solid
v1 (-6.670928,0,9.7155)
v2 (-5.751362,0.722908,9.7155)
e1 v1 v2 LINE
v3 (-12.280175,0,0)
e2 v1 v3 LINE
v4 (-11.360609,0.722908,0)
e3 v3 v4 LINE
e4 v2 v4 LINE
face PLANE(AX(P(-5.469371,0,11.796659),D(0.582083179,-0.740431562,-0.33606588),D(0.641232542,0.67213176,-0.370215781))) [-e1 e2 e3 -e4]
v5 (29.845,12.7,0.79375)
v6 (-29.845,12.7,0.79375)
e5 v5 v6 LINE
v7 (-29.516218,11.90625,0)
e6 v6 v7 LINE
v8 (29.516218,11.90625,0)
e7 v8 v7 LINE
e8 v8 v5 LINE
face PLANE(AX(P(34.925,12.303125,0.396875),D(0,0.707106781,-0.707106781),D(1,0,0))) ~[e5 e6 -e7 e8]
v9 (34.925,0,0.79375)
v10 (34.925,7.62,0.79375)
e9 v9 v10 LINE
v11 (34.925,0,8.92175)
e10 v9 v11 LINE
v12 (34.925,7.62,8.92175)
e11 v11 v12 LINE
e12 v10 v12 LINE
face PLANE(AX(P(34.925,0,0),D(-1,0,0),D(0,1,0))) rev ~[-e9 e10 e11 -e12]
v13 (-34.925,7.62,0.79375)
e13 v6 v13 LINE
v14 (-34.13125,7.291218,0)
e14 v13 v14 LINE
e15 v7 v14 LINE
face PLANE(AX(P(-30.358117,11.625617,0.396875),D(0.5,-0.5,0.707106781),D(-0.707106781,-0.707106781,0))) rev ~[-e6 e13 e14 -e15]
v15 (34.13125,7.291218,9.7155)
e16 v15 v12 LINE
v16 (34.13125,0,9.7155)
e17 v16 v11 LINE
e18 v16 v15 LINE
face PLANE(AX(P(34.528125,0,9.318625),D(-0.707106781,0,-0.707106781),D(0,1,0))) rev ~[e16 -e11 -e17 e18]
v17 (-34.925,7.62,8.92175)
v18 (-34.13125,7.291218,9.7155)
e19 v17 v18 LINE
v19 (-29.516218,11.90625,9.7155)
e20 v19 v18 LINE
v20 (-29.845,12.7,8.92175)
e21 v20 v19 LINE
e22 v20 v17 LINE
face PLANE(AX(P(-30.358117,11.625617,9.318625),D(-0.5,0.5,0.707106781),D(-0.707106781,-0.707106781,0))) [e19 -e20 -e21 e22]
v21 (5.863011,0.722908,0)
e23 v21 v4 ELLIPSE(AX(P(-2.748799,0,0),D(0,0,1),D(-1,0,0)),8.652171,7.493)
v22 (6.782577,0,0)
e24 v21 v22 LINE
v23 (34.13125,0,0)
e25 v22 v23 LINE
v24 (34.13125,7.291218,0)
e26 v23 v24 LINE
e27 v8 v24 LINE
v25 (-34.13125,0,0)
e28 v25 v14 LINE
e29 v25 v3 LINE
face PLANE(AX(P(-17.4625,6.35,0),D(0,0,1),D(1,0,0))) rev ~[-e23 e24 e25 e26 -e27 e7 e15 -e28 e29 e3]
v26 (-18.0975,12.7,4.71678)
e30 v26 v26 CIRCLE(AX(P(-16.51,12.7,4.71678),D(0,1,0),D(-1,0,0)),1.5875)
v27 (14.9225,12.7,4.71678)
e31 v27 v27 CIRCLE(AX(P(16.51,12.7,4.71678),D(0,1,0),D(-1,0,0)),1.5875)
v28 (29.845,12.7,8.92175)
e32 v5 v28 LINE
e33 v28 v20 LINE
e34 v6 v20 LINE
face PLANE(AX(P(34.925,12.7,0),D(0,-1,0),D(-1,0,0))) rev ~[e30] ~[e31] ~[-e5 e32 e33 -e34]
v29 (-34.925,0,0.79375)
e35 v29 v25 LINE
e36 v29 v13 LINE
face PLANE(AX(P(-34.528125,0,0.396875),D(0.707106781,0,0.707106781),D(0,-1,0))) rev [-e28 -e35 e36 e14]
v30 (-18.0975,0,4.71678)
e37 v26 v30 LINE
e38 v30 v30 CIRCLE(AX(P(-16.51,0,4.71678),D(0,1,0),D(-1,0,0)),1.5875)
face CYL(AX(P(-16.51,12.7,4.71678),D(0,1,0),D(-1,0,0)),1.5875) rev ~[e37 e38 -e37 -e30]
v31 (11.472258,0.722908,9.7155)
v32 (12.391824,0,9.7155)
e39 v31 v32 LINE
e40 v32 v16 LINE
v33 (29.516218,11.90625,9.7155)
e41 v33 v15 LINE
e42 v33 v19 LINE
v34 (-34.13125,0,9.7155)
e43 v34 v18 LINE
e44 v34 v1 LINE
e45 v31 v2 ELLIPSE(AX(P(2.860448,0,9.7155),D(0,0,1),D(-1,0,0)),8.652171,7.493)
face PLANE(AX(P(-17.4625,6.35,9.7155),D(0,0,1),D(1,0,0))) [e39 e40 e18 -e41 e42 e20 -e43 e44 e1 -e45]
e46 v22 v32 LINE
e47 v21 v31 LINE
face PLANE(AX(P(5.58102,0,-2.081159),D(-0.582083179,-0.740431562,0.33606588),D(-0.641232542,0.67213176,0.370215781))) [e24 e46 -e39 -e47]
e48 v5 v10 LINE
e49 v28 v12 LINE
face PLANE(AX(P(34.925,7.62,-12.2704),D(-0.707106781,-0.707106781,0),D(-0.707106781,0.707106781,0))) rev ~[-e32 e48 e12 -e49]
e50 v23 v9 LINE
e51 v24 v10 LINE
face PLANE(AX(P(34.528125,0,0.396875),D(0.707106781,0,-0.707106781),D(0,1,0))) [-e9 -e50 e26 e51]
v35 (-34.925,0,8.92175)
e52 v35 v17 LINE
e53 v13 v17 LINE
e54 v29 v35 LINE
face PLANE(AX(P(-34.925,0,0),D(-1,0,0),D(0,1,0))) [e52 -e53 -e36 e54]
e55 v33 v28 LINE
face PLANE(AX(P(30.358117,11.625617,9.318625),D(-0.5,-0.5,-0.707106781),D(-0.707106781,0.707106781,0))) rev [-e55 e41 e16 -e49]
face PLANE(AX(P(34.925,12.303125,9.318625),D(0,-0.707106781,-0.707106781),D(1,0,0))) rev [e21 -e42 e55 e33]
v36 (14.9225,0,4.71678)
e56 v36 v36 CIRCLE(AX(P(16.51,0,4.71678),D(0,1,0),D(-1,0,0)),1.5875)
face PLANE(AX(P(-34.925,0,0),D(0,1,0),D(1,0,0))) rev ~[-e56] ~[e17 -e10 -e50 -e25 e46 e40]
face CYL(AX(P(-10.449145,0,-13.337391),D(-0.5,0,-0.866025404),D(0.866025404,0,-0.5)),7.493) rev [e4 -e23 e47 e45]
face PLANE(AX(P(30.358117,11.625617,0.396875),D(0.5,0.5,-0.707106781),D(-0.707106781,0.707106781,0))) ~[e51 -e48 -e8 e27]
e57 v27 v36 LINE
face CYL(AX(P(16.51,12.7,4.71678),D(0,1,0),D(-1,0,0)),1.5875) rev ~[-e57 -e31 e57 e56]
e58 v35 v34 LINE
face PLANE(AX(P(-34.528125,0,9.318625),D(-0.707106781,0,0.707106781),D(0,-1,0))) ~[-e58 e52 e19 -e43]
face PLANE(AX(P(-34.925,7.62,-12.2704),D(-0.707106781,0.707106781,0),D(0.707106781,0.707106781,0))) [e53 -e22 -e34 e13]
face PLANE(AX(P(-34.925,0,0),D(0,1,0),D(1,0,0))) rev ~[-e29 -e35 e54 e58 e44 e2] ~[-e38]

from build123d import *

# Parameters (mm, degrees)
F0_W         = 34.925
F0_H         = 12.7
F1_DEPTH     = 9.7155
F3_R         = 1.5875
F4_DEPTH     = 25.4
F5_SIZE      = 0.79375
F6_T1_DEPTH  = 34.2562991577
F7_SIZE      = 0.79375
F11_R        = 7.493
F12_DEPTH    = 50.8
F13_T1_DEPTH = 15.1455192093
F13_T3_DEPTH = 15.1455192093


# Not quite as in the source:
# - a fillet or chamfer that OpenCascade refuses, or shapes differently, is made with other operations: its cross-section is extruded or revolved along the edge and cut away or added


with BuildPart() as f1:
    # F0 (on Top) → F1 (new body)
    with BuildSketch(Plane.XY):
        with Locations((-17.4625, 6.35)):
            Rectangle(F0_W, F0_H)
        with Locations((17.4625, 6.35)):
            Rectangle(F0_W, F0_H)
    extrude(amount=F1_DEPTH)

    # F3 (on face) → F4 (cut)
    with BuildSketch(Plane(origin=(0, 12.7, 0), x_dir=(-1, 0, 0), z_dir=(0, 1, 0))):
        with Locations((16.51, 4.71678)):
            Circle(F3_R)
        with Locations((-16.51, 4.71678)):
            Circle(F3_R)
    extrude(amount=-F4_DEPTH, mode=Mode.SUBTRACT)

    # F5
    f5_edges = [f1.edges().sort_by_distance(p)[0] for p in [
        (-34.925, 6.35, 9.7155),
        (34.925, 6.35, 9.7155),
        (0, 12.7, 9.7155),
        (0, 12.7, 0),
        (-34.925, 6.35, 0),
        (34.925, 6.35, 0),
    ]]
    chamfer(f5_edges, length=F5_SIZE)

    # F6: chamfer of 5.08 on 2 edges, made by hand

    # F6_s2 → F6_t1 (cut)
    with BuildSketch(Plane.XY.offset(-12.2703995789)):
        Polygon((34.925, 7.62), (29.845, 12.7), (34.925, 12.7), align=None)
        Polygon((-34.925, 7.62), (-29.845, 12.7), (-34.925, 12.7), align=None)
    extrude(amount=F6_T1_DEPTH, mode=Mode.SUBTRACT)

    # F7
    f7_edges = [f1.edges().sort_by_distance(p)[0] for p in [
        (32.385, 10.16, 0),
        (32.385, 10.16, 9.7155),
        (-32.385, 10.16, 9.7155),
        (-32.385, 10.16, 0),
    ]]
    chamfer(f7_edges, length=F7_SIZE)

    # F11 (on face) → F12 (cut)
    with BuildSketch(Plane(origin=(-8.3875461679, 0, -14.5276561136), x_dir=(0.8660254038, 0, -0.5), z_dir=(0.5, 0, 0.8660254038))):
        with Locations((-2.3805295629, 0)):
            Circle(F11_R)
    extrude(amount=F12_DEPTH, mode=Mode.SUBTRACT)

    # F13: chamfer of 0.8001 on 2 edges, made by hand

    # F13_s2 → F13_t1 (cut)
    with BuildSketch(Plane(origin=(3.740760597, 0, 6.4791874129), x_dir=(0, 1, 0), z_dir=(-0.5, 0, -0.8660254038))):
        with BuildLine():
            Line((0, -10.6349433883), (0.7229081164, -9.8385757451))
            ThreePointArc((0.7229081164, -9.8385757451), (0.3732081581, -9.8642294948), (0, -9.8735295629))
            Line((0, -9.8735295629), (0, -10.6349433883))
        make_face()
    extrude(amount=F13_T1_DEPTH, mode=Mode.SUBTRACT)

    # F13_s4 → F13_t3 (cut)
    with BuildSketch(Plane(origin=(0.4940865594, 0, 0.8557830242), x_dir=(0, 1, 0), z_dir=(0.5, 0, 0.8660254038))):
        with BuildLine():
            Line((0, -5.8738842624), (0.7229081164, -5.0775166192))
            ThreePointArc((0.7229081164, -5.0775166192), (0.3732081581, -5.103170369), (0, -5.1124704371))
            Line((0, -5.1124704371), (0, -5.8738842624))
        make_face()
    extrude(amount=F13_T3_DEPTH, mode=Mode.SUBTRACT)


solid = f1.part
